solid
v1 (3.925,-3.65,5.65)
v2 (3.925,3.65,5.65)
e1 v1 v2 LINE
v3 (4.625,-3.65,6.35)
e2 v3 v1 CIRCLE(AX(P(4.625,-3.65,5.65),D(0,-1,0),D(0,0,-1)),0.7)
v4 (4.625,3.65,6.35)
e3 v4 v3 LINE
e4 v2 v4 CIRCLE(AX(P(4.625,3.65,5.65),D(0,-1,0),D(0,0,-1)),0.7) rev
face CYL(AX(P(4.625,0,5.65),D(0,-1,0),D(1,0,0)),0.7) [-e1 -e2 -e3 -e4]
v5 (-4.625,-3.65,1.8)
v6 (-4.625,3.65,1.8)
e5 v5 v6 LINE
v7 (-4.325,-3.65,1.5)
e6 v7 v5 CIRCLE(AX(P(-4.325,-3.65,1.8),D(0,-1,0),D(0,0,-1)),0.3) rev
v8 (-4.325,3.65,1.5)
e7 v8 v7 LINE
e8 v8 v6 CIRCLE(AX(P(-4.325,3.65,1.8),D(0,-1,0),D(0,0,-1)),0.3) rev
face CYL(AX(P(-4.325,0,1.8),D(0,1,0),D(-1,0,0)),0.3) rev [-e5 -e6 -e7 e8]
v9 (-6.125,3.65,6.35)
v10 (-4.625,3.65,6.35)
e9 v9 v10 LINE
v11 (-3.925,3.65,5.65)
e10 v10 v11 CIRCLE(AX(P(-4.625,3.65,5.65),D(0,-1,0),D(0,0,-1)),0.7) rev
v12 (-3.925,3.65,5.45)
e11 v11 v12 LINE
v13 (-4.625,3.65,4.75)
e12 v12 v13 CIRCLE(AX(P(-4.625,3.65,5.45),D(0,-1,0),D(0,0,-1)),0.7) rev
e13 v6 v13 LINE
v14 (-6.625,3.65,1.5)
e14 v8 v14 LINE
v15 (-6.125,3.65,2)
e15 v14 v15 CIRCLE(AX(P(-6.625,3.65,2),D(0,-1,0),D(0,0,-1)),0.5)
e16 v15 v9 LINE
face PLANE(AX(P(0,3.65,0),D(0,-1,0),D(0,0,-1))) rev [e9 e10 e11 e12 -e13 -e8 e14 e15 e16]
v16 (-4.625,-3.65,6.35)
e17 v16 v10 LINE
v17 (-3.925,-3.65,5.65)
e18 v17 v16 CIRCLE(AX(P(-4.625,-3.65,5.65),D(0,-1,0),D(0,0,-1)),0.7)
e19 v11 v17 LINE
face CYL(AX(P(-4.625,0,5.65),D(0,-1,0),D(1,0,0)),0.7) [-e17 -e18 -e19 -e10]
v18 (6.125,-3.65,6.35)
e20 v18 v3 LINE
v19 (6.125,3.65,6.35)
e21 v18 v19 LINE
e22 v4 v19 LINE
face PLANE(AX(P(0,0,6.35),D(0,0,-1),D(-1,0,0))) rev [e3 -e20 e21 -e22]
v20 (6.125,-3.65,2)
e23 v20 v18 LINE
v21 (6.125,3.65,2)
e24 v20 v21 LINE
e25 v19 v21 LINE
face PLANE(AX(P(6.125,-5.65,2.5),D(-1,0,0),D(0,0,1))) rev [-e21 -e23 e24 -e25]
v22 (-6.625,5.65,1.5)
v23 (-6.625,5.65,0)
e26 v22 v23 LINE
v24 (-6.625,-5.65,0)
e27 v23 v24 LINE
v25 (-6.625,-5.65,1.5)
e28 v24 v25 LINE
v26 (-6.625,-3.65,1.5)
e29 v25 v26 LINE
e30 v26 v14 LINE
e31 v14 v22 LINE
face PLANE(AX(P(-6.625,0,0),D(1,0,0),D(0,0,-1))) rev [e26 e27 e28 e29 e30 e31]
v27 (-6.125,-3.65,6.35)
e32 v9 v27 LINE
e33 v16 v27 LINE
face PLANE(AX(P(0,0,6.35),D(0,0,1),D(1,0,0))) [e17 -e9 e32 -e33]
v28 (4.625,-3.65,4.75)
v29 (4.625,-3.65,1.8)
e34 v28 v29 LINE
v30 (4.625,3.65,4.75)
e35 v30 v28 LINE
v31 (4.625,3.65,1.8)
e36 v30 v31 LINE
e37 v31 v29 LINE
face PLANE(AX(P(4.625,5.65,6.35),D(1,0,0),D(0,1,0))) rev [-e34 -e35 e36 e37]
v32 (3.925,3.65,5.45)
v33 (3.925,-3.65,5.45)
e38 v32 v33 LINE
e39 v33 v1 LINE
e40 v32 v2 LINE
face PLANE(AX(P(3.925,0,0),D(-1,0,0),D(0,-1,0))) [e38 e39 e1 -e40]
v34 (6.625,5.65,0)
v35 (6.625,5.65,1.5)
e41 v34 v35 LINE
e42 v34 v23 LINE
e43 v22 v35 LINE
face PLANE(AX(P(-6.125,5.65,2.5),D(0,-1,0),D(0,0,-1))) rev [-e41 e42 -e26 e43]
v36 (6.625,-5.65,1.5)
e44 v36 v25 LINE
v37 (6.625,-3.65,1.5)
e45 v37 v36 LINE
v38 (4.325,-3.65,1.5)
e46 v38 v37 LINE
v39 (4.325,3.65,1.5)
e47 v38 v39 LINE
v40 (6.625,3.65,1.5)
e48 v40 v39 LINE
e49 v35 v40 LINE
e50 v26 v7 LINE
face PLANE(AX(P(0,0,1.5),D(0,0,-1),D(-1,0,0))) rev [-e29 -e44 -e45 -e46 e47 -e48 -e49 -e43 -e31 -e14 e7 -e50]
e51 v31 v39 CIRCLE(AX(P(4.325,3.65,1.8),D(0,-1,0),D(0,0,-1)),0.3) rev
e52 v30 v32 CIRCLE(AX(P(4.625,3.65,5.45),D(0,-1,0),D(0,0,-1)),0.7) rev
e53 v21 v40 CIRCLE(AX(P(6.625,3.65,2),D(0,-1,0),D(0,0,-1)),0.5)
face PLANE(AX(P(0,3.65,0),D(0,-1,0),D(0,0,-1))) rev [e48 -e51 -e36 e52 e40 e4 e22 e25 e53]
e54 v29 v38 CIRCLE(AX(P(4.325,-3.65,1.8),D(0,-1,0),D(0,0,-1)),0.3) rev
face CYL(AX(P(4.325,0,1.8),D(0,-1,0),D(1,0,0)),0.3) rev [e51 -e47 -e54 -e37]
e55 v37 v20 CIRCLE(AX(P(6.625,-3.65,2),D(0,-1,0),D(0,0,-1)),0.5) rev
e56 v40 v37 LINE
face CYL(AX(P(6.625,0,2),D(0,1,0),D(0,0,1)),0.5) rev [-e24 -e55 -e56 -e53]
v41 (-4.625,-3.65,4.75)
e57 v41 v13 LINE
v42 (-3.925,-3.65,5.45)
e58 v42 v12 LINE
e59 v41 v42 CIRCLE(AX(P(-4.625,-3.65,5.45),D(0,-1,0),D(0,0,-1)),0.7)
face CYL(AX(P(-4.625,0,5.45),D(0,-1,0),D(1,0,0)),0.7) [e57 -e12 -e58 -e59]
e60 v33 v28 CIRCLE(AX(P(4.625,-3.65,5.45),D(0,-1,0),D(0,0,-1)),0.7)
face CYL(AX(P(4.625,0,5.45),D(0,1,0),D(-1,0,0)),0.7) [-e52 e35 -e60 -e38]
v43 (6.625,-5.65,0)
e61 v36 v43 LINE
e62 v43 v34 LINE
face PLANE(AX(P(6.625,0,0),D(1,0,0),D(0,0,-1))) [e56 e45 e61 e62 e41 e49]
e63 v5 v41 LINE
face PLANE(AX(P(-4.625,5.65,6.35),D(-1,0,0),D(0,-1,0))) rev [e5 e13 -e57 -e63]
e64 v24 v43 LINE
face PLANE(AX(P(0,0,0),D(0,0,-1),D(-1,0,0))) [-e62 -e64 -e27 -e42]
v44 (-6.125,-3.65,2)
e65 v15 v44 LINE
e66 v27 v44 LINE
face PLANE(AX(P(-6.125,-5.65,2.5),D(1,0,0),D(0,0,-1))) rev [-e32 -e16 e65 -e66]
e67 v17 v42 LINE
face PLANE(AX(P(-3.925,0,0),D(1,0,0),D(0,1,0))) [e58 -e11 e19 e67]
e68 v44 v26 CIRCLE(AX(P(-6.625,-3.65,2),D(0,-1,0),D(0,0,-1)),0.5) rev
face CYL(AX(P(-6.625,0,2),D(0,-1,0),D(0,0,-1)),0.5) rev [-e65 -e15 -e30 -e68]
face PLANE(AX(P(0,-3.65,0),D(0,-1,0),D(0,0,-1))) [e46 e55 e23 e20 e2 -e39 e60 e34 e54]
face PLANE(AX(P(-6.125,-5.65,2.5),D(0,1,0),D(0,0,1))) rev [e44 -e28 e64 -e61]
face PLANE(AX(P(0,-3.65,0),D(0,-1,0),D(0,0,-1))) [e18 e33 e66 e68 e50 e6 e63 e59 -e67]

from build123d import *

# Parameters (mm, degrees)
SKETCH_1_W          = 12.25
SKETCH_1_H          = 11.3
EXTRUDE_1_DEPTH     = 2.5
SKETCH_2_W          = 1.5
SKETCH_2_H          = 11.3
EXTRUDE_2_DEPTH     = 3.85
SKETCH_5_W          = 9.25
SKETCH_5_H          = 11.5
CUT_EXTRUDE_1_DEPTH = 1
SKETCH_8_W          = 1.6
SKETCH_8_H          = 11.3
EXTRUDE_5_DEPTH     = 0.7
SKETCH_9_W          = 1.6
SKETCH_9_H          = 11.3
EXTRUDE_6_DEPTH     = 0.7
FILLET_8_R          = 0.3
SKETCH_11_W         = 12.25
SKETCH_11_H         = 4.85
CUT_EXTRUDE_2_DEPTH = 2
SKETCH_12_W         = 12.25
SKETCH_12_H         = 4.85
CUT_EXTRUDE_3_DEPTH = 2
SKETCH_13_W         = 1.5
SKETCH_13_H         = 11.3
EXTRUDE_7_DEPTH     = 0.5
SKETCH_14_W         = 1.5
SKETCH_14_H         = 11.3
EXTRUDE_8_DEPTH     = 0.5
FILLET_9_R          = 0.5
FILLET_10_R         = 0.7


with BuildPart() as part:
    # 스케치1 → 보스-돌출1 (new body)
    with BuildSketch(Plane.XY):
        Rectangle(SKETCH_1_W, SKETCH_1_H)
    extrude(amount=EXTRUDE_1_DEPTH)

    # 스케치2 → 보스-돌출2 (add)
    with BuildSketch(Plane.XY.offset(2.5)):
        with Locations((-5.375, 0)):
            Rectangle(SKETCH_2_W, SKETCH_2_H)
        with Locations((5.375, 0)):
            Rectangle(SKETCH_2_W, SKETCH_2_H)
    extrude(amount=EXTRUDE_2_DEPTH)

    # 스케치5 → 컷-돌출1 (cut)
    with BuildSketch(Plane.XY.offset(2.5)):
        Rectangle(SKETCH_5_W, SKETCH_5_H)
    extrude(amount=-CUT_EXTRUDE_1_DEPTH, mode=Mode.SUBTRACT)

    # 스케치8 → 보스-돌출5 (add)
    with BuildSketch(Plane(origin=(-4.625, 0, 0), x_dir=(0, 0, -1), z_dir=(1, 0, 0))):
        with Locations((-5.55, 0)):
            Rectangle(SKETCH_8_W, SKETCH_8_H)
    extrude(amount=EXTRUDE_5_DEPTH)

    # 스케치9 → 보스-돌출6 (add)
    with BuildSketch(Plane.ZY.offset(-4.625)):
        with Locations((5.55, 0)):
            Rectangle(SKETCH_9_W, SKETCH_9_H)
    extrude(amount=EXTRUDE_6_DEPTH)

    # 필렛8
    fillet_8_edges = [part.edges().sort_by_distance(p)[0] for p in [
        (4.625, 0, 1.5),
        (-4.625, 0, 1.5),
    ]]
    fillet(fillet_8_edges, radius=FILLET_8_R)

    # 스케치11 → 컷-돌출2 (cut)
    with BuildSketch(Plane(origin=(0, 5.65, 0), x_dir=(1, 0, 0), z_dir=(0, 1, 0))):
        with Locations((0, -3.925)):
            Rectangle(SKETCH_11_W, SKETCH_11_H)
    extrude(amount=-CUT_EXTRUDE_2_DEPTH, mode=Mode.SUBTRACT)

    # 스케치12 → 컷-돌출3 (cut)
    with BuildSketch(Plane.XZ.offset(5.65)):
        with Locations((0, 3.925)):
            Rectangle(SKETCH_12_W, SKETCH_12_H)
    extrude(amount=-CUT_EXTRUDE_3_DEPTH, mode=Mode.SUBTRACT)

    # 스케치13 → 보스-돌출7 (add)
    with BuildSketch(Plane(origin=(6.125, 0, 0), x_dir=(0, 0, -1), z_dir=(1, 0, 0))):
        with Locations((-0.75, 0)):
            Rectangle(SKETCH_13_W, SKETCH_13_H)
    extrude(amount=EXTRUDE_7_DEPTH)

    # 스케치14 → 보스-돌출8 (add)
    with BuildSketch(Plane.ZY.offset(6.125)):
        with Locations((0.75, 0)):
            Rectangle(SKETCH_14_W, SKETCH_14_H)
    extrude(amount=EXTRUDE_8_DEPTH)

    # 필렛9
    fillet_9_edges = [part.edges().sort_by_distance(p)[0] for p in [
        (6.125, 0, 1.5),
        (-6.125, 0, 1.5),
    ]]
    fillet(fillet_9_edges, radius=FILLET_9_R - 0.0001)  # a hair under: the kernel refuses the full size

    # 필렛10
    fillet_10_edges = [part.edges().sort_by_distance(p)[0] for p in [
        (-3.925, 0, 6.35),
        (-3.925, 0, 4.75),
        (3.925, 0, 4.75),
        (3.925, 0, 6.35),
    ]]
    fillet(fillet_10_edges, radius=FILLET_10_R - 0.0001)  # a hair under: the kernel refuses the full size


solid = part.part
